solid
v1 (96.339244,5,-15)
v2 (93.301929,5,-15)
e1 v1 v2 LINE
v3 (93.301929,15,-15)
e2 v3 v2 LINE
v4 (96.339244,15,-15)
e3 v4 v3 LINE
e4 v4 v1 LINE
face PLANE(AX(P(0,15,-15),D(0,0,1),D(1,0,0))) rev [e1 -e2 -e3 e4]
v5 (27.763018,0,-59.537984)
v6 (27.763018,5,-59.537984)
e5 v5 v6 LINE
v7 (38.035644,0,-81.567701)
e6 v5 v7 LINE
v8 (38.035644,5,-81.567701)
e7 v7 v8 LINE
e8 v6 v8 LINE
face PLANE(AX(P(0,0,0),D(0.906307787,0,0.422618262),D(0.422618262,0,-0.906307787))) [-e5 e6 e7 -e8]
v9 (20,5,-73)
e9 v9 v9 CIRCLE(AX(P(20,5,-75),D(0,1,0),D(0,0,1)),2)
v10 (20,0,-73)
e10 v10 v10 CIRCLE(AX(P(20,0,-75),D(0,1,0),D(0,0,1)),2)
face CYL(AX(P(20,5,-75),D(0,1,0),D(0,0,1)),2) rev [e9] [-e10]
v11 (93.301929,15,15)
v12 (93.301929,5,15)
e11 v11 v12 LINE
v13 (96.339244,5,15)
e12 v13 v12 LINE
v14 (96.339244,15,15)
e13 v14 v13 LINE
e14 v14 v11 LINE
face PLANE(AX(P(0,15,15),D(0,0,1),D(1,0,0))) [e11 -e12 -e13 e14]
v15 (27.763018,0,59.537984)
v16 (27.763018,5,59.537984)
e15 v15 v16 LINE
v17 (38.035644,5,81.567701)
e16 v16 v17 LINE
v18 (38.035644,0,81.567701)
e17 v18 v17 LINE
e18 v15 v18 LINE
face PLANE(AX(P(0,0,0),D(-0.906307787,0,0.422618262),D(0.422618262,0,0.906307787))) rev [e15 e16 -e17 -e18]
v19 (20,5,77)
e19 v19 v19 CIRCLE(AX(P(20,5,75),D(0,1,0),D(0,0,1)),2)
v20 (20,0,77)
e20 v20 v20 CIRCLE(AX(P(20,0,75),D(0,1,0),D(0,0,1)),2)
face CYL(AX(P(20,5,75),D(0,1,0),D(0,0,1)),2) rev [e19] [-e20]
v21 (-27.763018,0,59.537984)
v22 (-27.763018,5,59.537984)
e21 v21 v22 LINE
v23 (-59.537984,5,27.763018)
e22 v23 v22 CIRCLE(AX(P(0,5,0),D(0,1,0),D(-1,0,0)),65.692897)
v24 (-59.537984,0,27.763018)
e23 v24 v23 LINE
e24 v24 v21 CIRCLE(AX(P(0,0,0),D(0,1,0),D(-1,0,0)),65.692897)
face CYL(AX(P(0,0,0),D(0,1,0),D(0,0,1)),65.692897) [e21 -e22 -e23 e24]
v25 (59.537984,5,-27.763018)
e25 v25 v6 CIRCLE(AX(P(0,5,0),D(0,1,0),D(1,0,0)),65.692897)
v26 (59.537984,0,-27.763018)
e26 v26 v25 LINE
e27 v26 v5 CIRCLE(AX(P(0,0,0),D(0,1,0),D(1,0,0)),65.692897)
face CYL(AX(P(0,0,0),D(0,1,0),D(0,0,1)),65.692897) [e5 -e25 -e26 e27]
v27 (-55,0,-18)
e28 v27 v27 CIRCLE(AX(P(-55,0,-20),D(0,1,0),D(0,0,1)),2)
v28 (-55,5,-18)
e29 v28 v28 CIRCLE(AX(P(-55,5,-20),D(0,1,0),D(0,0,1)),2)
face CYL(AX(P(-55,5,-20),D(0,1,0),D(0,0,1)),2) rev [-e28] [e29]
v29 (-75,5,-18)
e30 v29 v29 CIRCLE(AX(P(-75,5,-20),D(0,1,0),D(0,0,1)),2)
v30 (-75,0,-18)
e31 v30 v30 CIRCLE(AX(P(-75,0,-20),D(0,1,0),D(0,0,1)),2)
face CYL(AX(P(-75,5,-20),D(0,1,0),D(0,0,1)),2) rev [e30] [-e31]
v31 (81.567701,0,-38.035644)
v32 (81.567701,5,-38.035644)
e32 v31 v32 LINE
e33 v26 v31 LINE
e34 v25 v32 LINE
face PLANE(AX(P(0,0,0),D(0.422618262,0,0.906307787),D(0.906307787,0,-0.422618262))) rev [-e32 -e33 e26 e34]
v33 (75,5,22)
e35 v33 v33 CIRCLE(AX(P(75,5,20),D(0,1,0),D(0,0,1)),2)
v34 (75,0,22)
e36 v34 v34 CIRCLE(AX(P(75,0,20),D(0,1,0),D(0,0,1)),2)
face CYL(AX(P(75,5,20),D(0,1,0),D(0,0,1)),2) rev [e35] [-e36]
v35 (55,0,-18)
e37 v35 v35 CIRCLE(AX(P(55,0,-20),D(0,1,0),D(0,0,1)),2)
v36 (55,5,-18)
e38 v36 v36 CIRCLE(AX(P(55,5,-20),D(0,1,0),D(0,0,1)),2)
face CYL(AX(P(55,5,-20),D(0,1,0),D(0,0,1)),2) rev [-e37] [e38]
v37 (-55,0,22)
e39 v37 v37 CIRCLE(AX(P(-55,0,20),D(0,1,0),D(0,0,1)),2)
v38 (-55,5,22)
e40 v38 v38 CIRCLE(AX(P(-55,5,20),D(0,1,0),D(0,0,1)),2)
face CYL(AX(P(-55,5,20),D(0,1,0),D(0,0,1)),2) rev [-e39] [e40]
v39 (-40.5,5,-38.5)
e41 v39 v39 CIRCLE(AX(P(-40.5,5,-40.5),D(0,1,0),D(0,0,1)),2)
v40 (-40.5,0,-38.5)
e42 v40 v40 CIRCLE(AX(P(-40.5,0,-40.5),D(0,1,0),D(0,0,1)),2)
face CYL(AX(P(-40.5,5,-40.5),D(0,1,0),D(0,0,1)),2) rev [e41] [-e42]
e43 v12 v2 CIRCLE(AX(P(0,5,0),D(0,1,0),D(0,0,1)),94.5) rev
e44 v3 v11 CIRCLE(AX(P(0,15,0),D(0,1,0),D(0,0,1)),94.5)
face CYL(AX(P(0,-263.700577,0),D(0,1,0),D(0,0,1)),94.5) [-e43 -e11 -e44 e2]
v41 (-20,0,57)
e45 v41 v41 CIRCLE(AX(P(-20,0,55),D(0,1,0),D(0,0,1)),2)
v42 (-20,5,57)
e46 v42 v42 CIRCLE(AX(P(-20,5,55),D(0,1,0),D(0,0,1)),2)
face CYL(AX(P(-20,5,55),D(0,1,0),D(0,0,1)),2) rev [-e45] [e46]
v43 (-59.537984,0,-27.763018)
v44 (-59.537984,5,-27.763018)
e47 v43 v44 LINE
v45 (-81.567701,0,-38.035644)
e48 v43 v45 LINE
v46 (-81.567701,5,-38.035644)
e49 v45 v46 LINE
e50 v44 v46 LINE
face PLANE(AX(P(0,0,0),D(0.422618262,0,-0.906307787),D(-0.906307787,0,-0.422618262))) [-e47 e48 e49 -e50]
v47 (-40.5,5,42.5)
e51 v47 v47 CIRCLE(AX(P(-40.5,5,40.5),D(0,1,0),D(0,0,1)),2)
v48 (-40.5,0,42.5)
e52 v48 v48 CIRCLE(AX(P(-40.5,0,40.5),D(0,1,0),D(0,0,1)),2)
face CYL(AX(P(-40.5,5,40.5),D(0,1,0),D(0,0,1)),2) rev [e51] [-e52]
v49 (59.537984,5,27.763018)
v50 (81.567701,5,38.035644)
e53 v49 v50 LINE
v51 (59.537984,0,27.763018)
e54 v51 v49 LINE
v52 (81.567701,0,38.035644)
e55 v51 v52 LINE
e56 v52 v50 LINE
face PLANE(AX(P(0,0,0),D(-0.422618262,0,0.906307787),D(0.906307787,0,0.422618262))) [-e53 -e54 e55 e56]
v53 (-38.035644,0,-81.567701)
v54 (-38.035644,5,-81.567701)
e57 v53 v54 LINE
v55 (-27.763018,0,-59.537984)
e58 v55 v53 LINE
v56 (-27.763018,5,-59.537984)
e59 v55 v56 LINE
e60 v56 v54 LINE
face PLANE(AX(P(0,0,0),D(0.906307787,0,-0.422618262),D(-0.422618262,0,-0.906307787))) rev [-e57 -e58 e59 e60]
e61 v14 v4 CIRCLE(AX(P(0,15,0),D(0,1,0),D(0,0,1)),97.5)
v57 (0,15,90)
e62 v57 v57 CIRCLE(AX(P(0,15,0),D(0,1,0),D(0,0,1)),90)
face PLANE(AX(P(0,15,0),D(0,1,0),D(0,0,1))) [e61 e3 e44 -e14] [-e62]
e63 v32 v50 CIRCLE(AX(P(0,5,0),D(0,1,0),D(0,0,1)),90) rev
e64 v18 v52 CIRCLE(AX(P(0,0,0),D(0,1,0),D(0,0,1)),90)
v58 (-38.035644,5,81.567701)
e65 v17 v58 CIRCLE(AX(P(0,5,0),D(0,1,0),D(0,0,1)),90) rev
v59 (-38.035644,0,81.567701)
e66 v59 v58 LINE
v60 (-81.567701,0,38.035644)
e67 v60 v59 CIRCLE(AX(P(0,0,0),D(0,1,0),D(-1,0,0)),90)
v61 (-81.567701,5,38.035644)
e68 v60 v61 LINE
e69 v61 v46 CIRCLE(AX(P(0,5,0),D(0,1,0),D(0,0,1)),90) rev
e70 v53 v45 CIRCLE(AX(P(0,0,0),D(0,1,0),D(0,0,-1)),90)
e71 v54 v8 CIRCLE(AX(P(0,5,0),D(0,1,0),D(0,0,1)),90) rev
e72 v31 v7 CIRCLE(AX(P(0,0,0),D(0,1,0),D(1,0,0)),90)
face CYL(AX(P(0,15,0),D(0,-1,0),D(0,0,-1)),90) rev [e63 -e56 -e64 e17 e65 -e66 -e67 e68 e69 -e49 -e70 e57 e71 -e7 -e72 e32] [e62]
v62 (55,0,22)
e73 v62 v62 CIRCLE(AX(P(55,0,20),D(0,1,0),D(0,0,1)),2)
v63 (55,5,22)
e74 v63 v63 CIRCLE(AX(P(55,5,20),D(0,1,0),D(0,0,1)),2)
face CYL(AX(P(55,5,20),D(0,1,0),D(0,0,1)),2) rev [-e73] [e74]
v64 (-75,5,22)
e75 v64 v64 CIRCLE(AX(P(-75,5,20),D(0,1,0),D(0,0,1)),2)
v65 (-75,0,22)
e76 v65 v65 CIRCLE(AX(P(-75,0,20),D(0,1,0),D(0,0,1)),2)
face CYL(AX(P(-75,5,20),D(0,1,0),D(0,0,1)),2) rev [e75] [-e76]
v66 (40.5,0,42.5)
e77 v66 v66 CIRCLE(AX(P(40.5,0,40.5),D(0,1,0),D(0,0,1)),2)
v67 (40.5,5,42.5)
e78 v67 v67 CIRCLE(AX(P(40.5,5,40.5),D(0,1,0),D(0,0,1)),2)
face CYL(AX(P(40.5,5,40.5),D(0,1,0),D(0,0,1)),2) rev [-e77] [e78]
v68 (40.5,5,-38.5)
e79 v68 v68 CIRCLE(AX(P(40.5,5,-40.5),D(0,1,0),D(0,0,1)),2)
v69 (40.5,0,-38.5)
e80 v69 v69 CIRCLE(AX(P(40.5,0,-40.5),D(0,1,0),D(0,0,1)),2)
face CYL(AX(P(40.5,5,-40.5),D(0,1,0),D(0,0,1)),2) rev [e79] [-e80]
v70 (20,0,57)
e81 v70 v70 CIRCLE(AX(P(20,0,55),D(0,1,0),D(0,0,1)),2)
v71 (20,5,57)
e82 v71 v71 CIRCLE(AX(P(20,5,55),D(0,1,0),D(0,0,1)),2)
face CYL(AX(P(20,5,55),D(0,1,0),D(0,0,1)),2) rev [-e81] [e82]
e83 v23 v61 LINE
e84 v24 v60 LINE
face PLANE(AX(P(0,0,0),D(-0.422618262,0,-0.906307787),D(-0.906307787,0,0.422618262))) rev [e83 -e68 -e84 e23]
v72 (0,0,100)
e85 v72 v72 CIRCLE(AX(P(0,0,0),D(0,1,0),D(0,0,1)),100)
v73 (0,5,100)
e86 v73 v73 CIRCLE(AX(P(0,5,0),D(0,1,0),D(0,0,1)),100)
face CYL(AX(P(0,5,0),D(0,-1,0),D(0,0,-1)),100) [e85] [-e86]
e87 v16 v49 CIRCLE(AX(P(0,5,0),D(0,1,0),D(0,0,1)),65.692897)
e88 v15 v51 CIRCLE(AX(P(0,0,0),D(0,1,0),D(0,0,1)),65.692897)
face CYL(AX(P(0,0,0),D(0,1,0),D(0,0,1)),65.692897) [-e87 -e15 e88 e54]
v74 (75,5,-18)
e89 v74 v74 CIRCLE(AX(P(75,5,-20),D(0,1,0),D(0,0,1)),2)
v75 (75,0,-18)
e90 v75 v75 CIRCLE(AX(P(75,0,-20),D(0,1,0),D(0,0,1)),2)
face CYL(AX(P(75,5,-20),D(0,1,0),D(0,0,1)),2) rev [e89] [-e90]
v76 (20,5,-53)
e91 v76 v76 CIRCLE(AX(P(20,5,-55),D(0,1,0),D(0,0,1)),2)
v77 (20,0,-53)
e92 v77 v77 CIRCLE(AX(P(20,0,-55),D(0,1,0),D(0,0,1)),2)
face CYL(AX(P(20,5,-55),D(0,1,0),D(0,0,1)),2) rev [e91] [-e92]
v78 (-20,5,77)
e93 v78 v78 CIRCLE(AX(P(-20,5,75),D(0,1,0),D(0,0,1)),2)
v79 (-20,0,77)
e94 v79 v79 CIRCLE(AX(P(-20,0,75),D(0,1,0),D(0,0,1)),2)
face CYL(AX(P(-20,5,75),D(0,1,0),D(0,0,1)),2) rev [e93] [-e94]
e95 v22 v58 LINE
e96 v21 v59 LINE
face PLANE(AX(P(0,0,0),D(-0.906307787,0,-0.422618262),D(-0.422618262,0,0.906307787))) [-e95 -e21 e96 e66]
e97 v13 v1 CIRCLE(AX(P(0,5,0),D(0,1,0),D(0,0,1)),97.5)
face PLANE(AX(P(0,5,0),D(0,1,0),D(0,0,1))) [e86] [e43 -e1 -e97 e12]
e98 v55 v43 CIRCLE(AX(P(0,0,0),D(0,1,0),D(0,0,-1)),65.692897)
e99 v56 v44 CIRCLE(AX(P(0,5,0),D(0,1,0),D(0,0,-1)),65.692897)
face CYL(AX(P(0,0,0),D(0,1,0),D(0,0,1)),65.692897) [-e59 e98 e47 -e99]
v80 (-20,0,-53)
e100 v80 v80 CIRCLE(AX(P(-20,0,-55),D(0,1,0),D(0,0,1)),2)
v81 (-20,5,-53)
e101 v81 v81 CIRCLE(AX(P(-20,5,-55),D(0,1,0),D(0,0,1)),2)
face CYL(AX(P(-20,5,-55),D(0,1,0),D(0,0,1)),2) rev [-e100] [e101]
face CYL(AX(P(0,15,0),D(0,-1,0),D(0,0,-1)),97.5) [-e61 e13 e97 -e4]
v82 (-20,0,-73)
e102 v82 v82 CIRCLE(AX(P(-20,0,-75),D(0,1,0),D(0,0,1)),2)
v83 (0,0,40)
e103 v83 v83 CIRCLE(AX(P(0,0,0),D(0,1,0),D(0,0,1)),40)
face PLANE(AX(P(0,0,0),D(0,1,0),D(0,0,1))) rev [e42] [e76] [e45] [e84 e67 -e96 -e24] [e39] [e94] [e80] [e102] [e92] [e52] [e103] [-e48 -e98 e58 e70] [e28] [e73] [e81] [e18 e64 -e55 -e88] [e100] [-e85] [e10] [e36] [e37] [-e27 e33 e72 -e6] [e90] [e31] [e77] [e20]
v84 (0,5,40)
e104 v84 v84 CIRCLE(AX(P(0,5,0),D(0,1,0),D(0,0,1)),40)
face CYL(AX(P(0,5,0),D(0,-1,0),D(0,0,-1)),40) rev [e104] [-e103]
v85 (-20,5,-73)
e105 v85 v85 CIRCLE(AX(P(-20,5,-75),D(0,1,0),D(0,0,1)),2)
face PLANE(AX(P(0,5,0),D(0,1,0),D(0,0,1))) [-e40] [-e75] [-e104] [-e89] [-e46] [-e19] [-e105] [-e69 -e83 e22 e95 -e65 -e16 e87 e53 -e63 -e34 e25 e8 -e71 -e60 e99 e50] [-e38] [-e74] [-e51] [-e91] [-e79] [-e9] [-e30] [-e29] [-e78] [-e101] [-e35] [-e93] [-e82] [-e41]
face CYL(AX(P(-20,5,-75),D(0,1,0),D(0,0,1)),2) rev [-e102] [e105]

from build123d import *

# Parameters (mm, degrees)
SKETCH1_R             = 100
SKETCH1_R_2           = 40
BOSS_EXTRUDE1_DEPTH   = 5
F_4_0MM_DOWEL_HOLE1_D = 4
SKETCH6_R             = 95
SKETCH6_R_2           = 90
BOSS_EXTRUDE2_DEPTH   = 10
F_4_0MM_DOWEL_HOLE2_D = 4
CUT_EXTRUDE1_DEPTH    = 142.774468788
CIRPATTERN1_DEPTH     = 5
CUT_EXTRUDE2_START    = -10
SKETCH10_R            = 95
SKETCH10_R_2          = 94.5
CUT_EXTRUDE2_DEPTH    = 10
BOSS_EXTRUDE3_DEPTH   = 10


# Read off the part's stored shape, not the designer's step: CirPattern1
with BuildPart() as part:
    # Sketch1 → Boss-Extrude1 (new body)
    with BuildSketch(Plane(origin=(0, 0, 0), x_dir=(1, 0, 0), z_dir=(0, 1, 0))):
        with Locations(Location((0, 0, 0), (0, 0, 270))):
            Circle(SKETCH1_R)
        with Locations(Location((0, 0, 0), (0, 0, 270))):
            Circle(SKETCH1_R_2, mode=Mode.SUBTRACT)
    extrude(amount=BOSS_EXTRUDE1_DEPTH)

    # Ø4.0mm Dowel Hole1 (through all)
    with Locations(Plane(origin=(0, 5, 0), x_dir=(1, 0, 0), z_dir=(0, 1, 0))):
        with Locations((0, 0), (40.5, 40.5), (-40.5, -40.5), (-40.5, 40.5), (40.5, -40.5)):
            Hole(F_4_0MM_DOWEL_HOLE1_D / 2)

    # Sketch6 → Boss-Extrude2 (add)
    with BuildSketch(Plane(origin=(0, 5, 0), x_dir=(1, 0, 0), z_dir=(0, 1, 0))):
        with Locations(Location((0, 0, 0), (0, 0, 270))):
            Circle(SKETCH6_R)
        with Locations(Location((0, 0, 0), (0, 0, 270))):
            Circle(SKETCH6_R_2, mode=Mode.SUBTRACT)
    extrude(amount=BOSS_EXTRUDE2_DEPTH)

    # Ø4.0mm Dowel Hole2 (through all)
    with Locations(Plane(origin=(0, 5, 0), x_dir=(1, 0, 0), z_dir=(0, 1, 0))):
        with Locations((0, 0), (75, 20), (-75, -20), (-75, 20), (75, -20), (20, 75), (-20, -75), (-20, 75), (20, -75), (20, 55), (-20, -55), (-20, 55), (20, -55), (55, -20), (-55, 20), (-55, -20), (55, 20)):
            Hole(F_4_0MM_DOWEL_HOLE2_D / 2)

    # Sketch9 → Cut-Extrude1 (cut, through all)
    with BuildSketch(Plane(origin=(0, 5, 0), x_dir=(1, 0, 0), z_dir=(0, 1, 0))):
        with BuildLine():
            Line((81.567700833, -38.035643557), (59.537983888, -27.763017838))
            ThreePointArc((59.537983888, -27.763017838), (46.451892776, -46.451892776), (27.763017838, -59.537983888))
            Line((27.763017838, -59.537983888), (38.035643557, -81.567700833))
            ThreePointArc((38.035643557, -81.567700833), (63.639610307, -63.639610307), (81.567700833, -38.035643557))
        make_face()
    extrude(amount=-CUT_EXTRUDE1_DEPTH, mode=Mode.SUBTRACT)

    # CirPattern1 outline → CirPattern1 (cut)
    with BuildSketch(Plane(origin=(0, 0, 0), x_dir=(1, 0, 0), z_dir=(0, 1, 0))):
        with BuildLine():
            Line((59.537983888, 27.763017838), (81.567700833, 38.035643557))
            ThreePointArc((81.567700833, 38.035643557), (63.639610307, 63.639610307), (38.035643557, 81.567700833))
            Line((38.035643557, 81.567700833), (27.763017838, 59.537983888))
            ThreePointArc((27.763017838, 59.537983888), (46.451892776, 46.451892776), (59.537983888, 27.763017838))
        make_face()
        with BuildLine():
            ThreePointArc((-81.567700833, -38.035643557), (-63.639610307, -63.639610307), (-38.035643557, -81.567700833))
            Line((-38.035643557, -81.567700833), (-27.763017838, -59.537983888))
            ThreePointArc((-27.763017838, -59.537983888), (-46.451892776, -46.451892776), (-59.537983888, -27.763017838))
            Line((-59.537983888, -27.763017838), (-81.567700833, -38.035643557))
        make_face()
        with BuildLine():
            Line((-27.763017838, 59.537983888), (-38.035643557, 81.567700833))
            ThreePointArc((-38.035643557, 81.567700833), (-63.639610307, 63.639610307), (-81.567700833, 38.035643557))
            Line((-81.567700833, 38.035643557), (-59.537983888, 27.763017838))
            ThreePointArc((-59.537983888, 27.763017838), (-46.451892776, 46.451892776), (-27.763017838, 59.537983888))
        make_face()
    extrude(amount=CIRPATTERN1_DEPTH, mode=Mode.SUBTRACT)

    # Sketch10 → Cut-Extrude2 (cut)
    with BuildSketch(Plane(origin=(0, 15, 0), x_dir=(1, 0, 0), z_dir=(0, 1, 0)).offset(CUT_EXTRUDE2_START)):
        Circle(SKETCH10_R)
        with Locations(Location((0, 0, 0), (0, 0, 270))):
            Circle(SKETCH10_R_2, mode=Mode.SUBTRACT)
    extrude(amount=CUT_EXTRUDE2_DEPTH, mode=Mode.SUBTRACT)

    # Sketch11 → Boss-Extrude3 (add)
    with BuildSketch(Plane(origin=(0, 5, 0), x_dir=(1, 0, 0), z_dir=(0, 1, 0))):
        with BuildLine():
            Line((93.301929241, -15), (96.33924434, -15))
            Line((96.33924434, -15), (96.33924434, 15))
            Line((96.33924434, 15), (93.301929241, 15))
            ThreePointArc((93.301929241, 15), (94.200006139, 7.52388486), (94.5, 0))
            ThreePointArc((94.5, 0), (94.200006139, -7.52388486), (93.301929241, -15))
        make_face()
        with BuildLine():
            Line((96.33924434, 15), (96.33924434, -15))
            ThreePointArc((96.33924434, -15), (97.209377951, -7.522422378), (97.5, 0))
            ThreePointArc((97.5, 0), (97.209377951, 7.522422378), (96.33924434, 15))
        make_face()
    extrude(amount=BOSS_EXTRUDE3_DEPTH)


solid = part.part
